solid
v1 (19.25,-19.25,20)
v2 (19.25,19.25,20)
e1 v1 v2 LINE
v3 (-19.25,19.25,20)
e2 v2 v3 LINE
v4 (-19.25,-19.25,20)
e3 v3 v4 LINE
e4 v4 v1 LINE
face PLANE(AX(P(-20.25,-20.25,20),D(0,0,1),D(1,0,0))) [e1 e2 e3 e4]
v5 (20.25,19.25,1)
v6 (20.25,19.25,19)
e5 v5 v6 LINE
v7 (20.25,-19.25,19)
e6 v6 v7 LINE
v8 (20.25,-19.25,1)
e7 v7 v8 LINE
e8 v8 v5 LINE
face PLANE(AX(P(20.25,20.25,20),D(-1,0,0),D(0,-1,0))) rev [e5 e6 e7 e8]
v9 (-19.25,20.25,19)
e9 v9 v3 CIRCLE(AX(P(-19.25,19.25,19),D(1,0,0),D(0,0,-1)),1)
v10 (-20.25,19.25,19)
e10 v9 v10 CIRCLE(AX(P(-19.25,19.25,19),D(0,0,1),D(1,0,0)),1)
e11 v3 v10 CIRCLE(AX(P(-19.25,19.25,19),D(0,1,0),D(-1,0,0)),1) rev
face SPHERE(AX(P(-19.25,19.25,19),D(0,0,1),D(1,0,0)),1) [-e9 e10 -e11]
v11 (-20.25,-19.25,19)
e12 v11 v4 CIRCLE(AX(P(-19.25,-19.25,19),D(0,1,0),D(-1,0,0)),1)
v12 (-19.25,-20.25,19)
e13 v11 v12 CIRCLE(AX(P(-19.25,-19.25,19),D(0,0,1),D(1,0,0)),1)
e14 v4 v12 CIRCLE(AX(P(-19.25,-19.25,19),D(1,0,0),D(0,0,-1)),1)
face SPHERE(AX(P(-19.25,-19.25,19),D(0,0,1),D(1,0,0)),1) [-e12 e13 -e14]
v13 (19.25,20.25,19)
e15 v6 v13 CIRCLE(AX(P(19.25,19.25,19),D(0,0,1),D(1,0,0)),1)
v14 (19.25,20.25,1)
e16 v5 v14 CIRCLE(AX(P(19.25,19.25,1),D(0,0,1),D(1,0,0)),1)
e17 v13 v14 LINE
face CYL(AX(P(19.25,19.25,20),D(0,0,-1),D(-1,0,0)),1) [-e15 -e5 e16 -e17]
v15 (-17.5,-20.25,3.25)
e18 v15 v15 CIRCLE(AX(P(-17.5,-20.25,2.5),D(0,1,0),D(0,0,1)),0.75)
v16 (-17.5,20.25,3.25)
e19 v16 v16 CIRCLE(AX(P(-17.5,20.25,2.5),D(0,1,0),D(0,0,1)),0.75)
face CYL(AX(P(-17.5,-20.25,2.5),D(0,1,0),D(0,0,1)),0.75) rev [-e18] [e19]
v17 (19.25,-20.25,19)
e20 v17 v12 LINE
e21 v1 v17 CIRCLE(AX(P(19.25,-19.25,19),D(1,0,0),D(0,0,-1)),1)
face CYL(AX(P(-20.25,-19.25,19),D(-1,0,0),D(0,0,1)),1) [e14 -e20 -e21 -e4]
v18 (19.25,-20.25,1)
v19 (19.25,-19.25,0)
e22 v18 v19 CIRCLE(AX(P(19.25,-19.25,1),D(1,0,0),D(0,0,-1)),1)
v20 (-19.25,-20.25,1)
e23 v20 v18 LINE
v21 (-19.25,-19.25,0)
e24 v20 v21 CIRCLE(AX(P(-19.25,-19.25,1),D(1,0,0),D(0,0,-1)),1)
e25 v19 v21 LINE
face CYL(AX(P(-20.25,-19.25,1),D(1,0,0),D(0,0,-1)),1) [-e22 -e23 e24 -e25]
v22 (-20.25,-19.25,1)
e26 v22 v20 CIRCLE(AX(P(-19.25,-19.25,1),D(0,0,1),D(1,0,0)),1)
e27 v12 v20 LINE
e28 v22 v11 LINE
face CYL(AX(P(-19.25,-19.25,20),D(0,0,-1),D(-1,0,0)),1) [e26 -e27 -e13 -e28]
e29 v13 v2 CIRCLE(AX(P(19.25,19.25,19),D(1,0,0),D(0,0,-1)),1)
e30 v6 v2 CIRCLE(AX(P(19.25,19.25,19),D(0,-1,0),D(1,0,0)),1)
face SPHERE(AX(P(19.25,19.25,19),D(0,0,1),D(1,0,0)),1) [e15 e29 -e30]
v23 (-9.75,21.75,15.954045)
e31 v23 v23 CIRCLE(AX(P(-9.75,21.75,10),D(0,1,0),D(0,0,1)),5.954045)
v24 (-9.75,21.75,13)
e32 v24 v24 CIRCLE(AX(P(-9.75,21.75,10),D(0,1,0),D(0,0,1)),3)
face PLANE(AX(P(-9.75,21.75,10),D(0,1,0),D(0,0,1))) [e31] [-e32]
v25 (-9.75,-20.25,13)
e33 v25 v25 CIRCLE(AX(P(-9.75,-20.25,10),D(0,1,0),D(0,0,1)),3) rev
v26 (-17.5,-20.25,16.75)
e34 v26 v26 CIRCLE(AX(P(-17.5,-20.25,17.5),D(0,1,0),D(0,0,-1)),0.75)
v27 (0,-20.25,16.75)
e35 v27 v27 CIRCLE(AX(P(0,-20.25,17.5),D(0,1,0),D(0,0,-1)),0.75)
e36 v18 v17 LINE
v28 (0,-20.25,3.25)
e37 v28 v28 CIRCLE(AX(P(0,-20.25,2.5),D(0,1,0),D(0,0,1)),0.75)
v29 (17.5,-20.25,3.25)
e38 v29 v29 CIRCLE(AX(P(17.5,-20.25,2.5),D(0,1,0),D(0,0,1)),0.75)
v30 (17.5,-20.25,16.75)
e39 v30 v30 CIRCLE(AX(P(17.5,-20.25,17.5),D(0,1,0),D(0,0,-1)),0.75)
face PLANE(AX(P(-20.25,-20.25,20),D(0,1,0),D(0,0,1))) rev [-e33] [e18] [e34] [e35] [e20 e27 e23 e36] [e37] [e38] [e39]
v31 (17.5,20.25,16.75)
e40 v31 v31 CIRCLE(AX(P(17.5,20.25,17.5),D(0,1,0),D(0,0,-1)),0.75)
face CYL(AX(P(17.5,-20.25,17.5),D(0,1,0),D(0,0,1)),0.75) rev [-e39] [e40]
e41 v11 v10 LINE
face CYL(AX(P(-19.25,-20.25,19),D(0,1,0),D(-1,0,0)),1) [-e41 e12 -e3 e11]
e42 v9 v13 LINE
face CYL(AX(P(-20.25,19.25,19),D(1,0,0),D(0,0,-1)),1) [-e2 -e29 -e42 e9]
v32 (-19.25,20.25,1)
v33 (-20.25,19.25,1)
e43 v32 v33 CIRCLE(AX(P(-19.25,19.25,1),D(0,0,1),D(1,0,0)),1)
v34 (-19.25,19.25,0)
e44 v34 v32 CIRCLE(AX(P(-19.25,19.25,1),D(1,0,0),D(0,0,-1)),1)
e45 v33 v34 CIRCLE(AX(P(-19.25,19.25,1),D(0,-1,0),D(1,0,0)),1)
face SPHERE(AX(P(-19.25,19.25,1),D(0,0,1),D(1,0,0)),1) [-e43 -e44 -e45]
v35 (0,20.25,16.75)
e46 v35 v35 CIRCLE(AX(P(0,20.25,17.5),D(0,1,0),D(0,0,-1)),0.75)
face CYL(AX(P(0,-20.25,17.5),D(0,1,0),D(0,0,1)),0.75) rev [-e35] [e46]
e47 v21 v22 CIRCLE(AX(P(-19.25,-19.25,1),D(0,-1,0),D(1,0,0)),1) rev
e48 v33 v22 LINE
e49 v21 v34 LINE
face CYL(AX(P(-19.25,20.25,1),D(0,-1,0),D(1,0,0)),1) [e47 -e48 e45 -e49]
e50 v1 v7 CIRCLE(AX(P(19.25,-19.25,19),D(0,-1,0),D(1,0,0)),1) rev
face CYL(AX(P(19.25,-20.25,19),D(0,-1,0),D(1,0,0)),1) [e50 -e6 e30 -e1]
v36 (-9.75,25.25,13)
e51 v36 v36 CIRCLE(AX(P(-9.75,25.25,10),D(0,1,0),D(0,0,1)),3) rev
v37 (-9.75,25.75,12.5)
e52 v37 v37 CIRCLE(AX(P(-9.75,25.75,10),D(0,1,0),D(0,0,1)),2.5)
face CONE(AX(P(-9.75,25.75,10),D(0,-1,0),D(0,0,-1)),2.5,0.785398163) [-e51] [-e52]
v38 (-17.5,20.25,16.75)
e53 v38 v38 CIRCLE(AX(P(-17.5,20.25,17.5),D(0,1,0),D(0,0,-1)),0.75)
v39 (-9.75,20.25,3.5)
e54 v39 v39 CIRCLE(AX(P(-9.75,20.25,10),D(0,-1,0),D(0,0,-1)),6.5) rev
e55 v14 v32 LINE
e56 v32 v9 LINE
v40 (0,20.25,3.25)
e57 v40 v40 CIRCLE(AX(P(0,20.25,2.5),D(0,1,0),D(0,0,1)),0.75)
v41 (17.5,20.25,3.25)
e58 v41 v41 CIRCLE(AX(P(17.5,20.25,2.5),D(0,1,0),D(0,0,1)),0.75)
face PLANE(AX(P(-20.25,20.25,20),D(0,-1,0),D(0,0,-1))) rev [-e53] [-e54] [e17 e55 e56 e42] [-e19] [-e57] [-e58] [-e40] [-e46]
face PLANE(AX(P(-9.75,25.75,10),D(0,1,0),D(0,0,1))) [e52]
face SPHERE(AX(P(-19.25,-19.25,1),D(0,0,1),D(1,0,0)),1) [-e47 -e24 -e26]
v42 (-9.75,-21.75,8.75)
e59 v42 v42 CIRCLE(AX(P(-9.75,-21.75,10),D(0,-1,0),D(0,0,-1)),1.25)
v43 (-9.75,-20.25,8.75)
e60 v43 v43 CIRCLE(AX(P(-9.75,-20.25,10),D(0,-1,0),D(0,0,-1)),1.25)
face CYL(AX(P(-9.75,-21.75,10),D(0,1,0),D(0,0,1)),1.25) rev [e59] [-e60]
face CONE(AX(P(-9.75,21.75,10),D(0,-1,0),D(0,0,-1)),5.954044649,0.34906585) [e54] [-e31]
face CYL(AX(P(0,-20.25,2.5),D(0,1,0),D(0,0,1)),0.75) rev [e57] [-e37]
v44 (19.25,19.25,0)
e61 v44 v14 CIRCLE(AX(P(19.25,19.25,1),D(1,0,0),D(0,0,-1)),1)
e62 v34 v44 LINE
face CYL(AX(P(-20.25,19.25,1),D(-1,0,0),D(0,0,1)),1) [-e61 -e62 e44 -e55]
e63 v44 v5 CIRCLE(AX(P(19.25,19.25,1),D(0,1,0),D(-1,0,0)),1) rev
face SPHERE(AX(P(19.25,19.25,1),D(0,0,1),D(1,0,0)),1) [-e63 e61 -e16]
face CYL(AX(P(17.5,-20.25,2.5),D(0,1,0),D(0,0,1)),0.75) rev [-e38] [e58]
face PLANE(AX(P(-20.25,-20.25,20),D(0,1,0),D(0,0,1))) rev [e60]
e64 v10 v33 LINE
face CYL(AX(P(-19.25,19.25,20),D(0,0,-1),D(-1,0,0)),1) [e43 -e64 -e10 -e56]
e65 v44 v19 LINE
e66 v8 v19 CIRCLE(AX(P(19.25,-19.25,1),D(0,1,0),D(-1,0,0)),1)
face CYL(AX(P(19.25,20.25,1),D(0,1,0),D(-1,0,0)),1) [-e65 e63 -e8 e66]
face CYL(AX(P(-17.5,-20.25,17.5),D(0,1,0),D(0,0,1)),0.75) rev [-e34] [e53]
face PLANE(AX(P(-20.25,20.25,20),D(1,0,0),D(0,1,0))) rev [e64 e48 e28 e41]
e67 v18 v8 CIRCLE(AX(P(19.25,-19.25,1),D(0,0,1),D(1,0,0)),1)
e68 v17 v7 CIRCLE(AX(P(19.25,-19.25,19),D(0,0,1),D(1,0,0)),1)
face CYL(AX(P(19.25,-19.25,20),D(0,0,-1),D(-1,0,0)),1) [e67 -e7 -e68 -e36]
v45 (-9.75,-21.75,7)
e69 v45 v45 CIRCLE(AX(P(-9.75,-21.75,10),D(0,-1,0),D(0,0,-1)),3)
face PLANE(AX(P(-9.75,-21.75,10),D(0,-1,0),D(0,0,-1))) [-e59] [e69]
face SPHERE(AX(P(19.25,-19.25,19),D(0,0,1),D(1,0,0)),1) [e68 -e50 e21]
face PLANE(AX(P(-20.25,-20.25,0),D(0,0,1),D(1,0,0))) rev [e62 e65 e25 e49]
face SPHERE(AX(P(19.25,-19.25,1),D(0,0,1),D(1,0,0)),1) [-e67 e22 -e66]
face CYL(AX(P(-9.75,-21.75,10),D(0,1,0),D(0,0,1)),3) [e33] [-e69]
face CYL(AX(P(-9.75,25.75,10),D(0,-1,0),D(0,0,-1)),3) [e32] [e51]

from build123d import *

# Parameters (mm, degrees)
SKETCH_1_W          = 40.5
SKETCH_1_H          = 40.5
EXTRUDE_1_DEPTH     = 20
SKETCH_2_R          = 6.5
EXTRUDE_2_DEPTH     = 1.5
SKETCH_5_R          = 0.75
CUT_EXTRUDE_1_DEPTH = 50.500631309
SKETCH_12_R         = 3
EXTRUDE_3_DEPTH     = 4
CHAMFER_1_SIZE2     = 0.545955351
CHAMFER_1_SIZE      = 1.5
CHAMFER_2_SIZE      = 0.5
EXTRUDE_START       = 1.5
SKETCH_18_R         = 3
SKETCH_18_R_2       = 1.25
EXTRUDE_4_DEPTH     = 1.5
FILLET_2_R          = 1
FILLET_3_R          = 1


with BuildPart() as part:
    # 草圖1 → 伸長1 (new body)
    with BuildSketch(Plane.XY):
        Rectangle(SKETCH_1_W, SKETCH_1_H)
    extrude(amount=EXTRUDE_1_DEPTH)

    # 草圖2 → 伸長2 (add)
    with BuildSketch(Plane(origin=(0, 20.25, 0), x_dir=(1, 0, 0), z_dir=(0, 1, 0))):
        with Locations(Location((-9.75, -10, 0), (0, 0, 90))):
            Circle(SKETCH_2_R)
    extrude(amount=EXTRUDE_2_DEPTH)

    # 草圖5 → 除料-伸長1 (cut, through all)
    with BuildSketch(Plane(origin=(0, 20.25, 0), x_dir=(1, 0, 0), z_dir=(0, 1, 0))):
        with Locations(Location((-17.5, -2.5, 0), (0, 0, 270))):
            Circle(SKETCH_5_R)
        with Locations(Location((0, -2.5, 0), (0, 0, 270))):
            Circle(SKETCH_5_R)
        with Locations(Location((17.5, -2.5, 0), (0, 0, 270))):
            Circle(SKETCH_5_R)
        with Locations(Location((17.5, -17.5, 0), (0, 0, 90))):
            Circle(SKETCH_5_R)
        with Locations(Location((0, -17.5, 0), (0, 0, 90))):
            Circle(SKETCH_5_R)
        with Locations(Location((-17.5, -17.5, 0), (0, 0, 90))):
            Circle(SKETCH_5_R)
    extrude(amount=-CUT_EXTRUDE_1_DEPTH, mode=Mode.SUBTRACT)

    # 草圖12 → 伸長3 (add)
    with BuildSketch(Plane(origin=(0, 21.75, 0), x_dir=(1, 0, 0), z_dir=(0, 1, 0))):
        with Locations(Location((-9.75, -10, 0), (0, 0, 270))):
            Circle(SKETCH_12_R)
    extrude(amount=EXTRUDE_3_DEPTH)

    # 導角1
    chamfer_1_edges = [part.edges().sort_by_distance(p)[0] for p in [
        (-9.75, 21.75, 16.5),
    ]]
    chamfer_1_side = [part.faces().sort_by_distance(p)[0] for p in [
        (-9.75, 21.739080893, 16.5),
    ]]
    chamfer(chamfer_1_edges, length=CHAMFER_1_SIZE - 0.0001, length2=CHAMFER_1_SIZE2 - 0.0001, reference=chamfer_1_side[0])  # a hair under: the kernel refuses the full size

    # 導角2
    chamfer_2_edges = [part.edges().sort_by_distance(p)[0] for p in [
        (-9.75, 25.75, 7),
    ]]
    chamfer(chamfer_2_edges, length=CHAMFER_2_SIZE)

    # 草圖18 → 伸長4 (add)
    with BuildSketch(Plane.XZ.offset(20.25).offset(EXTRUDE_START)):
        with Locations(Location((-9.75, 10, 0), (0, 0, 90))):
            Circle(SKETCH_18_R)
        with Locations(Location((-9.75, 10, 0), (0, 0, 270))):
            Circle(SKETCH_18_R_2, mode=Mode.SUBTRACT)
    extrude(amount=-EXTRUDE_4_DEPTH)

    # 圓角2
    fillet_2_edges = [part.edges().sort_by_distance(p)[0] for p in [
        (20.25, 0, 20),
        (-20.25, 0, 20),
        (20.25, 0, 0),
        (-20.25, 0, 0),
    ]]
    fillet(fillet_2_edges, radius=FILLET_2_R)

    # 圓角3
    fillet_3_edges = [part.edges().sort_by_distance(p)[0] for p in [
        (0, -20.25, 20),
        (0, 20.25, 20),
        (0, 20.25, 0),
        (-20.25, 20.25, 10),
        (20.25, 20.25, 10),
        (-19.957106781, 20.25, 19.707106781),
        (-19.957106781, 20.25, 0.292893219),
        (19.957106781, 20.25, 0.292893219),
        (19.957106781, 20.25, 19.707106781),
        (20.25, -20.25, 10),
        (0, -20.25, 0),
        (-20.25, -20.25, 10),
        (-19.957106781, -20.25, 19.707106781),
        (-19.957106781, -20.25, 0.292893219),
        (19.957106781, -20.25, 0.292893219),
        (19.957106781, -20.25, 19.707106781),
    ]]
    fillet(fillet_3_edges, radius=FILLET_3_R)


solid = part.part
